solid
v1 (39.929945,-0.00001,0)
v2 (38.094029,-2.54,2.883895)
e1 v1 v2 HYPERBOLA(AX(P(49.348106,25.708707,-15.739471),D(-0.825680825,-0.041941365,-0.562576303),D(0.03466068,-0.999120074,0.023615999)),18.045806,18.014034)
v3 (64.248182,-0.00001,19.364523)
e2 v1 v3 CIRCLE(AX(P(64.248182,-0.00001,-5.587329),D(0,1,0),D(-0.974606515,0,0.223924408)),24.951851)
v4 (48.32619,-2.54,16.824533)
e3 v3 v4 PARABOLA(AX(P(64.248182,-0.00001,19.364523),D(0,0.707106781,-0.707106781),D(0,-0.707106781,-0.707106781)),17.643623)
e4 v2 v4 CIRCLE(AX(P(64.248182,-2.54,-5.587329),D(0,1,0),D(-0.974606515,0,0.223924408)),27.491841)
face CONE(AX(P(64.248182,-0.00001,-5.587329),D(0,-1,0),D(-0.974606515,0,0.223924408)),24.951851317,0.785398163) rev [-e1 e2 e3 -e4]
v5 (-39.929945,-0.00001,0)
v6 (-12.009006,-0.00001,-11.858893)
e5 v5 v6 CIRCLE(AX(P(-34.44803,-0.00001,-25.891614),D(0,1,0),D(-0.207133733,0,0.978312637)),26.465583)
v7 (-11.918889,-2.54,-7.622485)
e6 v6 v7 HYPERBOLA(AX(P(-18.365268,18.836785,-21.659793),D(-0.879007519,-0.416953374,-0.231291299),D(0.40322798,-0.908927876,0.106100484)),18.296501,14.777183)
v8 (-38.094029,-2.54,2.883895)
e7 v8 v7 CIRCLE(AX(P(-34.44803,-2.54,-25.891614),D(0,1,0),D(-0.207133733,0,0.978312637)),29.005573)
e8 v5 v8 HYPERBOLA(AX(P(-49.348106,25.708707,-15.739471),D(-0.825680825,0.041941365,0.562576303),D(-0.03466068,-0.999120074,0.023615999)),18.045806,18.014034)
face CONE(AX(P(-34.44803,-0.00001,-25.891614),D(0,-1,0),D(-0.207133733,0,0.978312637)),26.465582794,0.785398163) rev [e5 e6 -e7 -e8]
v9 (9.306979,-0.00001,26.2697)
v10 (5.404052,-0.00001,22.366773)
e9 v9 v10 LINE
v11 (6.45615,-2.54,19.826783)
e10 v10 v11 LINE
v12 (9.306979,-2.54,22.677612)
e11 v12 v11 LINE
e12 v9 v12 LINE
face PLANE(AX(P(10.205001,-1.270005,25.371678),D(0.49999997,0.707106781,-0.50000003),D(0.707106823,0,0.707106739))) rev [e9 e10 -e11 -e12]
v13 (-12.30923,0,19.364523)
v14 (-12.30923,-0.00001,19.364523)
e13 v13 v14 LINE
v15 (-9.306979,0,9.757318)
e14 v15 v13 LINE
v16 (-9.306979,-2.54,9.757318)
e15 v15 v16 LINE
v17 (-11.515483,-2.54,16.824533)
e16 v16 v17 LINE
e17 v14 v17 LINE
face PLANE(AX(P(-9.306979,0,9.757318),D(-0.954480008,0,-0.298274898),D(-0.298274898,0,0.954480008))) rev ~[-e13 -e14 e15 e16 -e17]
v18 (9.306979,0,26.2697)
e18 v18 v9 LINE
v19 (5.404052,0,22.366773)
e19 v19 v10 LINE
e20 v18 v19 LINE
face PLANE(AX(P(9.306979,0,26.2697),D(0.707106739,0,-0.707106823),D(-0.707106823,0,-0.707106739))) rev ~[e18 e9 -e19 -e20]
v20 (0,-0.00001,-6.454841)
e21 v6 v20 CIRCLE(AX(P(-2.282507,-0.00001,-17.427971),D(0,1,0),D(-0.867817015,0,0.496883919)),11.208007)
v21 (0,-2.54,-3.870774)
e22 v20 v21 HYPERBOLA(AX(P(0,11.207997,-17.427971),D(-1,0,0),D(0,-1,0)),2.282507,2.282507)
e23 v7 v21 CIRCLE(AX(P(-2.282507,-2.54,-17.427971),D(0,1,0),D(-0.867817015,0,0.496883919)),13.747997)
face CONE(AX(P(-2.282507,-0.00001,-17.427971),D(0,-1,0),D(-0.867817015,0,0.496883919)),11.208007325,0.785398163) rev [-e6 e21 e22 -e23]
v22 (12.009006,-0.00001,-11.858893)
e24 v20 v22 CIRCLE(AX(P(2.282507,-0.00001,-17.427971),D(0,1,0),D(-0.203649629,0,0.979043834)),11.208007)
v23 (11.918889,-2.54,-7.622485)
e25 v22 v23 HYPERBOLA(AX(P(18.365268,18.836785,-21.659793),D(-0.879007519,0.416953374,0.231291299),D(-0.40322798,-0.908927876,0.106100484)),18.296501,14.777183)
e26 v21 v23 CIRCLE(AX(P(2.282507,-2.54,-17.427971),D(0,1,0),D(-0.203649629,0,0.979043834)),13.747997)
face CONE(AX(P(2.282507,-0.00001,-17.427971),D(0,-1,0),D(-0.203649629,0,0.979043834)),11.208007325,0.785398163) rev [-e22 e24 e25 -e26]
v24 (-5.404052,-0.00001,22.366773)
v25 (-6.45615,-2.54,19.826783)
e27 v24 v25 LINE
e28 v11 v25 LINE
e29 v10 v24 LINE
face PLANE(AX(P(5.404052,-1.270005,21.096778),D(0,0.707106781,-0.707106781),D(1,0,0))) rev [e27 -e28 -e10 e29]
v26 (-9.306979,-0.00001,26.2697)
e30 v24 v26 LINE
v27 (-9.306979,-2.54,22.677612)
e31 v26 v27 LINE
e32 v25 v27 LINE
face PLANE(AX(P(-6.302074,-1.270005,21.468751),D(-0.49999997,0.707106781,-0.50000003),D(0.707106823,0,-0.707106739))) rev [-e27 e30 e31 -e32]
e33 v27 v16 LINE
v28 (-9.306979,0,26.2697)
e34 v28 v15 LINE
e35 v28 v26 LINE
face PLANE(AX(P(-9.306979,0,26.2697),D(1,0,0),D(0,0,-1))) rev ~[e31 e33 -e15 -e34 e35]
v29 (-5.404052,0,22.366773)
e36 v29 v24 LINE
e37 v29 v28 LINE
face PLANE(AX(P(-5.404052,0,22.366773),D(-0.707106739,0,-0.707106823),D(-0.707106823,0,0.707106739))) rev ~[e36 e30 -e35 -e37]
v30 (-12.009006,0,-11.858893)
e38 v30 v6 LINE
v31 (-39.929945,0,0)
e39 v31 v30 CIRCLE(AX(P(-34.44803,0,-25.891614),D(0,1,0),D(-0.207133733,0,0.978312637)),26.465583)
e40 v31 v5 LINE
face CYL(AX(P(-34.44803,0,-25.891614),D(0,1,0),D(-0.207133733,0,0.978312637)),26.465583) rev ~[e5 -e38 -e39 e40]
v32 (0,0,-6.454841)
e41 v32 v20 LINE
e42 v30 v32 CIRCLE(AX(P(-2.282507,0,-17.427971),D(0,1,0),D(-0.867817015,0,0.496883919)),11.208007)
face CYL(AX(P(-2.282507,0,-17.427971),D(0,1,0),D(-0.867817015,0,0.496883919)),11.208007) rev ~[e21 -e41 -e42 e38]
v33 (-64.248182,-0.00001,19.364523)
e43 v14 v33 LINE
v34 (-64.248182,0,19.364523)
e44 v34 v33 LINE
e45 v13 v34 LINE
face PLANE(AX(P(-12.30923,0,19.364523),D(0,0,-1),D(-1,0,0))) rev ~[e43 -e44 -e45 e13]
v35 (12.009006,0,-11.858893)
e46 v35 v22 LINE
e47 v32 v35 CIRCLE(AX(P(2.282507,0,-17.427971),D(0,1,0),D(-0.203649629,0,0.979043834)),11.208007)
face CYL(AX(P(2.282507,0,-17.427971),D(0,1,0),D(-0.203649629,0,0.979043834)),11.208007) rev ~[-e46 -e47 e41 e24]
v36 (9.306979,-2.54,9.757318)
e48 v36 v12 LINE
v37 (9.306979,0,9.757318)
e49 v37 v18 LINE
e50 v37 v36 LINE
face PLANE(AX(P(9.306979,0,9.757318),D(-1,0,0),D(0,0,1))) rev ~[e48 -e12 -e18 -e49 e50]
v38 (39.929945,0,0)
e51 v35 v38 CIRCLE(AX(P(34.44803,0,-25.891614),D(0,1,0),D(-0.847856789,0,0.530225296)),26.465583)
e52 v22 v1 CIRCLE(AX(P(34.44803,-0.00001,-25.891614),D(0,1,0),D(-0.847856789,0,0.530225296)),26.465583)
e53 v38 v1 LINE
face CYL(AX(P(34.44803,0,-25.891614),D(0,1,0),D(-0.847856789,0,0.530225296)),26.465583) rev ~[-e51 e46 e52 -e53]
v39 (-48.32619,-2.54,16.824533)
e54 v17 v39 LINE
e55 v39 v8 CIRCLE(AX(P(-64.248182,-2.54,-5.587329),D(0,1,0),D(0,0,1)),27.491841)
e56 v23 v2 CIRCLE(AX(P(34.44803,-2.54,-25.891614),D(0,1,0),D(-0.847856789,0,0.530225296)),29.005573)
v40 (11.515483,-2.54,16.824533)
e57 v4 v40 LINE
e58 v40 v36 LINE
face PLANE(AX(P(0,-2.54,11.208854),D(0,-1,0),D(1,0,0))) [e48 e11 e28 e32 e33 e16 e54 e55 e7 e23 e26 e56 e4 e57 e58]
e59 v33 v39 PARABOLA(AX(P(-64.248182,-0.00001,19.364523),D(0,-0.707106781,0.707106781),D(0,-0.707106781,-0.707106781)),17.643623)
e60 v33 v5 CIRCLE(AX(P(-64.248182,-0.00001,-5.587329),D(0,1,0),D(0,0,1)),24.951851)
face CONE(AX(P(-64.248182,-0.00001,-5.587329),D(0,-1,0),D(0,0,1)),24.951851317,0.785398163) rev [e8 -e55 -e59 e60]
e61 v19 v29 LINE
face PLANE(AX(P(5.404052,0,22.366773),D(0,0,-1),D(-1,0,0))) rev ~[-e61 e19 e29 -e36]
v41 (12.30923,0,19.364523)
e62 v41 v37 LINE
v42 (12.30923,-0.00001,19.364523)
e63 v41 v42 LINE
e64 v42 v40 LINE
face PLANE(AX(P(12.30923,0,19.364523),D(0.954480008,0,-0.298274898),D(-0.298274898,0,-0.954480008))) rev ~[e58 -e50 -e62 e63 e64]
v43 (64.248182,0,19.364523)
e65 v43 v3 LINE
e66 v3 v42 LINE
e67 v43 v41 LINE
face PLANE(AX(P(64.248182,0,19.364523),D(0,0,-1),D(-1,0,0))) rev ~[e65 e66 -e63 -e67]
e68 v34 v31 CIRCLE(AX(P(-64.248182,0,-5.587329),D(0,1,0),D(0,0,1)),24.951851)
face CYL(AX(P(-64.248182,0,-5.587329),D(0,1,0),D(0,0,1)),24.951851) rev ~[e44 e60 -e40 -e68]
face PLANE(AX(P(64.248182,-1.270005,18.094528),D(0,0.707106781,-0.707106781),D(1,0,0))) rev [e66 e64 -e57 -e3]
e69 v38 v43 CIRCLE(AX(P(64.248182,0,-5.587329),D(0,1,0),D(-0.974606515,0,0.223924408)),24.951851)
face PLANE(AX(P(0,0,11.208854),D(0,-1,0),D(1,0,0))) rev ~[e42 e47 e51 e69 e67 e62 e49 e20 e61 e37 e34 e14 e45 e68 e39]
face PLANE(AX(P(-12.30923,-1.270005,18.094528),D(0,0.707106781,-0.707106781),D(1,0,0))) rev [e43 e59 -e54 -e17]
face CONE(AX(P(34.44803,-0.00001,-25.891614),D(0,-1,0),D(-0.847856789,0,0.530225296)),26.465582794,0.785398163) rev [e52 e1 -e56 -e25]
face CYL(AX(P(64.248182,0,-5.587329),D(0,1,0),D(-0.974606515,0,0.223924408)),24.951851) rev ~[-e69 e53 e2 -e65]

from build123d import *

# Parameters (mm, degrees)
F1_DEPTH = 2.54
F2_SIZE  = 2.53999


# Not quite as in the source:
# - a fillet or chamfer is up to 0.001 mm smaller than in the source, because OpenCascade refuses the exact size


with BuildPart() as f1:
    # F0 (on Front) → F1 (new body)
    with BuildSketch(Plane.XZ):
        with BuildLine():
            Line((-12.3092299327, 19.36452277), (-64.2481818795, 19.36452277))
            ThreePointArc((-64.2481818795, 19.36452277), (-48.7050050326, 13.9320089842), (-39.9299450219, 0))
            ThreePointArc((-39.9299450219, 0), (-24.1018123493, -1.5321631259), (-12.0090059936, -11.8588926271))
            ThreePointArc((-12.0090059936, -11.8588926271), (-6.881876251, -7.2071480524), (0, -6.4548407681))
            ThreePointArc((0, -6.4548407681), (6.881876251, -7.2071480524), (12.0090059936, -11.8588926271))
            ThreePointArc((12.0090059936, -11.8588926271), (24.1018123493, -1.5321631259), (39.9299450219, 0))
            ThreePointArc((39.9299450219, 0), (48.7050050326, 13.9320089842), (64.2481818795, 19.36452277))
            Line((64.2481818795, 19.36452277), (12.3092299327, 19.36452277))
            Line((12.3092299327, 19.36452277), (9.3069793656, 9.7573176026))
            Line((9.3069793656, 9.7573176026), (9.3069793656, 26.2697003782))
            Line((9.3069793656, 26.2697003782), (5.4040518589, 22.3667733371))
            Line((5.4040518589, 22.3667733371), (0, 22.3667733371))
            Line((0, 22.3667733371), (-5.4040518589, 22.3667733371))
            Line((-5.4040518589, 22.3667733371), (-9.3069793656, 26.2697003782))
            Line((-9.3069793656, 26.2697003782), (-9.3069793656, 9.7573176026))
            Line((-9.3069793656, 9.7573176026), (-12.3092299327, 19.36452277))
        make_face()
    extrude(amount=F1_DEPTH)

    # F2 (size 2.54 in the source; OpenCascade refuses exactly that, so slightly less here)
    f2_edges = [f1.edges().sort_by_distance(p)[0] for p in [
        (-38.278706, -2.54, 19.364523),
        (38.278706, -2.54, 19.364523),
        (48.705005, -2.54, 13.932009),
        (24.101812, -2.54, -1.532163),
        (6.881876, -2.54, -7.207148),
        (-6.881876, -2.54, -7.207148),
        (-24.101812, -2.54, -1.532163),
        (-48.705005, -2.54, 13.932009),
        (-7.355516, -2.54, 24.318237),
        (0, -2.54, 22.366773),
        (7.355516, -2.54, 24.318237),
    ]]
    chamfer(f2_edges, length=F2_SIZE)


solid = f1.part
